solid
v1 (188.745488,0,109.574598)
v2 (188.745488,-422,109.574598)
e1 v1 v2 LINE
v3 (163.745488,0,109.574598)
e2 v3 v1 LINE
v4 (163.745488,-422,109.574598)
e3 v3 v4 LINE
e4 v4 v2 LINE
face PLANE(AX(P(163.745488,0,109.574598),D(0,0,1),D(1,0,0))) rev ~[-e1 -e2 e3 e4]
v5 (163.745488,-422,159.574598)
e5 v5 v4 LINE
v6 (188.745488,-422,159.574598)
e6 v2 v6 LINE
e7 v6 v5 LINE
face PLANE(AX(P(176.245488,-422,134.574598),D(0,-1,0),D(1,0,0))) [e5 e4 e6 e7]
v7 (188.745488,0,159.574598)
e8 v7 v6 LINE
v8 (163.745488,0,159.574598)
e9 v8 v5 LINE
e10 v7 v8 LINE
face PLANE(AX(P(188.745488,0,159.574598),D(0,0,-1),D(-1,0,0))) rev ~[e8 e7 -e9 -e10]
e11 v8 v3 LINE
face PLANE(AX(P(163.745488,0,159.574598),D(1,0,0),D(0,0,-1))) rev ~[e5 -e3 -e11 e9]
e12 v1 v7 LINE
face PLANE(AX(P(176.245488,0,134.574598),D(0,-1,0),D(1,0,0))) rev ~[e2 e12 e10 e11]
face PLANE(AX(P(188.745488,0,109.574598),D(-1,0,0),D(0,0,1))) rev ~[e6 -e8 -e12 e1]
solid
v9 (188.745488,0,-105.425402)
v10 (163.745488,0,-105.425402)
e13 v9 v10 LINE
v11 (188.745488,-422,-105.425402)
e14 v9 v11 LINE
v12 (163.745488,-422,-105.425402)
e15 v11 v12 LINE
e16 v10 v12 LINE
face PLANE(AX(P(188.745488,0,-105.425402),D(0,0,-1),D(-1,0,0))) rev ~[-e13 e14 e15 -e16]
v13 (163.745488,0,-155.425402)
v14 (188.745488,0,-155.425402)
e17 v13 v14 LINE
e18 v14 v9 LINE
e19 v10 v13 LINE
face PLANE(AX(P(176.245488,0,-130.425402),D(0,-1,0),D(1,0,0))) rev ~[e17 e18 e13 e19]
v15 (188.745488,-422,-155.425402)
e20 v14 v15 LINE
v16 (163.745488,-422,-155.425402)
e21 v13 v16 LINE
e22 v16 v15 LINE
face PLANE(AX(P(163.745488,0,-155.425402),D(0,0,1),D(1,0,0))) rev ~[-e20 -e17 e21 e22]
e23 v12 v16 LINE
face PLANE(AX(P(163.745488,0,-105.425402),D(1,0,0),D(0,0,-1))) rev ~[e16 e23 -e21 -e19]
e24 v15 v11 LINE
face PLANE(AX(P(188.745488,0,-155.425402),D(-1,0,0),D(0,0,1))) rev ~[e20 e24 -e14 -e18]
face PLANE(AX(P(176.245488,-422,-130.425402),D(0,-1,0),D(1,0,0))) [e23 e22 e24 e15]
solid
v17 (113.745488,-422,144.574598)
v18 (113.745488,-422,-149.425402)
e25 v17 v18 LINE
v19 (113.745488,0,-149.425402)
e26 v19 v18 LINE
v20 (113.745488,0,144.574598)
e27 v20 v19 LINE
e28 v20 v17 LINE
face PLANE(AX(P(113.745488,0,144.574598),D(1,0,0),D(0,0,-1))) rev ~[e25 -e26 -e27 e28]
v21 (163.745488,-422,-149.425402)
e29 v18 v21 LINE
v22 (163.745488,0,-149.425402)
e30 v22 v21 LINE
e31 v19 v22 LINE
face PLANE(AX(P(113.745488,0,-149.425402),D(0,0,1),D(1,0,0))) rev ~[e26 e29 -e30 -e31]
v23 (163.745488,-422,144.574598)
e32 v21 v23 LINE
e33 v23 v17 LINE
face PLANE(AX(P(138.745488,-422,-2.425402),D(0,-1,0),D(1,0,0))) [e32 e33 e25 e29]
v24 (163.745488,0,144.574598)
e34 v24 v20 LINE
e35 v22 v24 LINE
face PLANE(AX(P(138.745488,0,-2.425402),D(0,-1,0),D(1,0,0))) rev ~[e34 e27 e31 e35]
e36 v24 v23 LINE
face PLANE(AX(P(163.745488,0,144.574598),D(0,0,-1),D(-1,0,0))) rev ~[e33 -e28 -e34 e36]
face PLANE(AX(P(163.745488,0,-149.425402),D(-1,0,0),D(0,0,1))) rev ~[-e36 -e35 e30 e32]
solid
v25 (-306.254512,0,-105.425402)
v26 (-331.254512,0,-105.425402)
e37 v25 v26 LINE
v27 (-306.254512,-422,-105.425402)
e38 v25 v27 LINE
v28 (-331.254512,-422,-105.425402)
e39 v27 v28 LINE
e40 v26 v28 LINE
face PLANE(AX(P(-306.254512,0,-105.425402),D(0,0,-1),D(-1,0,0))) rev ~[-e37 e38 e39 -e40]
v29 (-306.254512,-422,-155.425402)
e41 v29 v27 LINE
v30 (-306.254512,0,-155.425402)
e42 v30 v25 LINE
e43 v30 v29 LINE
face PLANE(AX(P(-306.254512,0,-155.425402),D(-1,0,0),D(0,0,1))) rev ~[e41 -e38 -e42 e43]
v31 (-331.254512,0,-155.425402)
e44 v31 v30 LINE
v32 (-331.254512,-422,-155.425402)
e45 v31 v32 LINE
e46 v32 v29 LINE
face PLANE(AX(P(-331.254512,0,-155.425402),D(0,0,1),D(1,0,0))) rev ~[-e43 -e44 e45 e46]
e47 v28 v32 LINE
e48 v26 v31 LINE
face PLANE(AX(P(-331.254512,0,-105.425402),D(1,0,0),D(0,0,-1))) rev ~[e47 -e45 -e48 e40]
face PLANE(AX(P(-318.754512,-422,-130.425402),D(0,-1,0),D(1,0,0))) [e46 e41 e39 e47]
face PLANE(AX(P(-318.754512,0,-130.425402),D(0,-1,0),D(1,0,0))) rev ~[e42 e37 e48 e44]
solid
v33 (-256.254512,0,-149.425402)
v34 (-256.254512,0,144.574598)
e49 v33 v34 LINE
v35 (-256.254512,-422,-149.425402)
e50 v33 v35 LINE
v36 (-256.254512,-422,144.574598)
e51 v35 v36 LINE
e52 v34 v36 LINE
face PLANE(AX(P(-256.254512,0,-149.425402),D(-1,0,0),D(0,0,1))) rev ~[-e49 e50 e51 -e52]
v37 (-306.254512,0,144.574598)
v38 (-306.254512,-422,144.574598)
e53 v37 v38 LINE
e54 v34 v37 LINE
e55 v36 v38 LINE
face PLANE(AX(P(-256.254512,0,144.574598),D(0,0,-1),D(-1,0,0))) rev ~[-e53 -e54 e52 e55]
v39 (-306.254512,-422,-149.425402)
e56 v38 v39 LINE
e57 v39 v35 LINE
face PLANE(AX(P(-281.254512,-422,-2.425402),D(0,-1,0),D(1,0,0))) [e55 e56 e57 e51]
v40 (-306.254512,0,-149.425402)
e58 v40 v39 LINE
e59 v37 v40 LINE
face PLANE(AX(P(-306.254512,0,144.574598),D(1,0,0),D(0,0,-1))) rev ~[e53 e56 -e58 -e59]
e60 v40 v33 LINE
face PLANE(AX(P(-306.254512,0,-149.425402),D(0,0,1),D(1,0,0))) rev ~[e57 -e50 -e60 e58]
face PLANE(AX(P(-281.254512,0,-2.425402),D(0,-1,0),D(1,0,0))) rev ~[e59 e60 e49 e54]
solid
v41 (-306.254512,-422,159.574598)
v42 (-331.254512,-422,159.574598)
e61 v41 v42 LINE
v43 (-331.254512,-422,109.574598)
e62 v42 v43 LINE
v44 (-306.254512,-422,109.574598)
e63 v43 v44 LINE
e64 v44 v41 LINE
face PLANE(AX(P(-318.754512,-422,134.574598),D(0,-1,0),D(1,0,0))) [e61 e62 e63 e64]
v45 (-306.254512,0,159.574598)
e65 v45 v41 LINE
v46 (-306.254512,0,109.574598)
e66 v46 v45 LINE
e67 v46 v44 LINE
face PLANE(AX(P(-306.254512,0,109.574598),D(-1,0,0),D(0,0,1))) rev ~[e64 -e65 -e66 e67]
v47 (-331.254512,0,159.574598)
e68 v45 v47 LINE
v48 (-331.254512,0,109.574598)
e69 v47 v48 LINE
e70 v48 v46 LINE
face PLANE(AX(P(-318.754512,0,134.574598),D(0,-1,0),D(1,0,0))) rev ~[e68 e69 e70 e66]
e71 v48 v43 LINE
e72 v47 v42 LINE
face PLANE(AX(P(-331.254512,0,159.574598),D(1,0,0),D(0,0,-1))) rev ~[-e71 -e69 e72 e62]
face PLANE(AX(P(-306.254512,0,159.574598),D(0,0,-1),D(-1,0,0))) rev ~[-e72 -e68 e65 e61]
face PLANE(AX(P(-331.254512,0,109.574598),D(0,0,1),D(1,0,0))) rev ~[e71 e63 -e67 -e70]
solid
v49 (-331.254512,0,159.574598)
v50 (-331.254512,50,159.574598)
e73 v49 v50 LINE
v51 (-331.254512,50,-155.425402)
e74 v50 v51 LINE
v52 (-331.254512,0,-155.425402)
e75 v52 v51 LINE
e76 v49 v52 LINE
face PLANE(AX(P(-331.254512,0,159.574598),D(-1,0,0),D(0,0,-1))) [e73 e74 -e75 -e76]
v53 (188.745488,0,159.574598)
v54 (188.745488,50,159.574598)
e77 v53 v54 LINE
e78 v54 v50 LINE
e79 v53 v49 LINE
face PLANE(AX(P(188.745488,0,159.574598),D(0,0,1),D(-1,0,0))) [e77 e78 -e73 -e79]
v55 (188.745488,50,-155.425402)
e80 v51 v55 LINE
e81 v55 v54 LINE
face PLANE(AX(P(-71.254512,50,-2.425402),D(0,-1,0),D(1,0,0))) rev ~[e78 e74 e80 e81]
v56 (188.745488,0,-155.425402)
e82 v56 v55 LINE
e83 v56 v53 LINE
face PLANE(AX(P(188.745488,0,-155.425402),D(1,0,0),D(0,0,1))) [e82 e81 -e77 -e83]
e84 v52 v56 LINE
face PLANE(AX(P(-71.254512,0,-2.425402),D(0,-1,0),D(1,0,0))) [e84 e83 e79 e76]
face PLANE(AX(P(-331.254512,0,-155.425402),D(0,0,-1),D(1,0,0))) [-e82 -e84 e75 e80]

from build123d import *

# Parameters (mm, degrees)
F2_DEPTH = 422
F3_DEPTH = 422
F4_DEPTH = 422
F1_W     = 370
F1_H     = 294
F1_W_2   = 25
F1_H_2   = 215
F5_DEPTH = 50


# Not quite as in the source:
# - a feature names something its author has since deleted; it is built from what else it names


with BuildPart() as f2:
    # F1 (on Front) → F2 (new body)
    with BuildSketch(Plane.XZ):
        Polygon((-306.2545120716, 109.5745983869), (-306.2545120716, 144.5745983869), (-306.2545120716, 159.5745983869), (-331.2545120716, 159.5745983869), (-331.2545120716, 109.5745983869), align=None)
    extrude(amount=F2_DEPTH)


with BuildPart() as f2b:
    # F1 (on Front) → F2, piece 2 (new body)
    with BuildSketch(Plane.XZ):
        Polygon((163.7454879284, 159.5745983869), (163.7454879284, 144.5745983869), (163.7454879284, 109.5745983869), (188.7454879284, 109.5745983869), (188.7454879284, 159.5745983869), align=None)
    extrude(amount=F2_DEPTH)


with BuildPart() as f3:
    # F1 (on Front) → F3 (new body)
    with BuildSketch(Plane.XZ):
        Polygon((-306.2545120716, -149.4254016131), (-256.2545120716, -149.4254016131), (-256.2545120716, 144.5745983869), (-306.2545120716, 144.5745983869), (-306.2545120716, 109.5745983869), (-306.2545120716, -105.4254016131), align=None)
    extrude(amount=F3_DEPTH)


with BuildPart() as f3b:
    # F1 (on Front) → F3, piece 2 (new body)
    with BuildSketch(Plane.XZ):
        Polygon((113.7454879284, 144.5745983869), (113.7454879284, -149.4254016131), (163.7454879284, -149.4254016131), (163.7454879284, -105.4254016131), (163.7454879284, 109.5745983869), (163.7454879284, 144.5745983869), align=None)
    extrude(amount=F3_DEPTH)


with BuildPart() as f4:
    # F1 (on Front) → F4 (new body)
    with BuildSketch(Plane.XZ):
        Polygon((-306.2545120716, -155.4254016131), (-306.2545120716, -149.4254016131), (-306.2545120716, -105.4254016131), (-331.2545120716, -105.4254016131), (-331.2545120716, -155.4254016131), align=None)
    extrude(amount=F4_DEPTH)


with BuildPart() as f4b:
    # F1 (on Front) → F4, piece 2 (new body)
    with BuildSketch(Plane.XZ):
        Polygon((163.7454879284, -105.4254016131), (163.7454879284, -149.4254016131), (163.7454879284, -155.4254016131), (188.7454879284, -155.4254016131), (188.7454879284, -105.4254016131), align=None)
    extrude(amount=F4_DEPTH)


with BuildPart() as f5:
    # F1 (on Front) → F5 (new body)
    with BuildSketch(Plane.XZ):
        with Locations((-71.2545120716, -2.4254016131)):
            Rectangle(F1_W, F1_H)
        Polygon((-306.2545120716, -149.4254016131), (-256.2545120716, -149.4254016131), (-256.2545120716, 144.5745983869), (-306.2545120716, 144.5745983869), (-306.2545120716, 109.5745983869), (-306.2545120716, -105.4254016131), align=None)
        Polygon((113.7454879284, -149.4254016131), (-256.2545120716, -149.4254016131), (-306.2545120716, -149.4254016131), (-306.2545120716, -155.4254016131), (163.7454879284, -155.4254016131), (163.7454879284, -149.4254016131), align=None)
        Polygon((113.7454879284, 144.5745983869), (113.7454879284, -149.4254016131), (163.7454879284, -149.4254016131), (163.7454879284, -105.4254016131), (163.7454879284, 109.5745983869), (163.7454879284, 144.5745983869), align=None)
        Polygon((-306.2545120716, 144.5745983869), (-256.2545120716, 144.5745983869), (113.7454879284, 144.5745983869), (163.7454879284, 144.5745983869), (163.7454879284, 159.5745983869), (-306.2545120716, 159.5745983869), align=None)
        Polygon((-306.2545120716, -155.4254016131), (-306.2545120716, -149.4254016131), (-306.2545120716, -105.4254016131), (-331.2545120716, -105.4254016131), (-331.2545120716, -155.4254016131), align=None)
        Polygon((163.7454879284, -105.4254016131), (163.7454879284, -149.4254016131), (163.7454879284, -155.4254016131), (188.7454879284, -155.4254016131), (188.7454879284, -105.4254016131), align=None)
        Polygon((-306.2545120716, 109.5745983869), (-306.2545120716, 144.5745983869), (-306.2545120716, 159.5745983869), (-331.2545120716, 159.5745983869), (-331.2545120716, 109.5745983869), align=None)
        with Locations((-318.7545120716, 2.0745983869)):
            Rectangle(F1_W_2, F1_H_2)
        Polygon((163.7454879284, 159.5745983869), (163.7454879284, 144.5745983869), (163.7454879284, 109.5745983869), (188.7454879284, 109.5745983869), (188.7454879284, 159.5745983869), align=None)
        with Locations((176.2454879284, 2.0745983869)):
            Rectangle(F1_W_2, F1_H_2)
    extrude(amount=-F5_DEPTH)


solid = Compound([f2.part, f2b.part, f3.part, f3b.part, f4.part, f4b.part, f5.part])
